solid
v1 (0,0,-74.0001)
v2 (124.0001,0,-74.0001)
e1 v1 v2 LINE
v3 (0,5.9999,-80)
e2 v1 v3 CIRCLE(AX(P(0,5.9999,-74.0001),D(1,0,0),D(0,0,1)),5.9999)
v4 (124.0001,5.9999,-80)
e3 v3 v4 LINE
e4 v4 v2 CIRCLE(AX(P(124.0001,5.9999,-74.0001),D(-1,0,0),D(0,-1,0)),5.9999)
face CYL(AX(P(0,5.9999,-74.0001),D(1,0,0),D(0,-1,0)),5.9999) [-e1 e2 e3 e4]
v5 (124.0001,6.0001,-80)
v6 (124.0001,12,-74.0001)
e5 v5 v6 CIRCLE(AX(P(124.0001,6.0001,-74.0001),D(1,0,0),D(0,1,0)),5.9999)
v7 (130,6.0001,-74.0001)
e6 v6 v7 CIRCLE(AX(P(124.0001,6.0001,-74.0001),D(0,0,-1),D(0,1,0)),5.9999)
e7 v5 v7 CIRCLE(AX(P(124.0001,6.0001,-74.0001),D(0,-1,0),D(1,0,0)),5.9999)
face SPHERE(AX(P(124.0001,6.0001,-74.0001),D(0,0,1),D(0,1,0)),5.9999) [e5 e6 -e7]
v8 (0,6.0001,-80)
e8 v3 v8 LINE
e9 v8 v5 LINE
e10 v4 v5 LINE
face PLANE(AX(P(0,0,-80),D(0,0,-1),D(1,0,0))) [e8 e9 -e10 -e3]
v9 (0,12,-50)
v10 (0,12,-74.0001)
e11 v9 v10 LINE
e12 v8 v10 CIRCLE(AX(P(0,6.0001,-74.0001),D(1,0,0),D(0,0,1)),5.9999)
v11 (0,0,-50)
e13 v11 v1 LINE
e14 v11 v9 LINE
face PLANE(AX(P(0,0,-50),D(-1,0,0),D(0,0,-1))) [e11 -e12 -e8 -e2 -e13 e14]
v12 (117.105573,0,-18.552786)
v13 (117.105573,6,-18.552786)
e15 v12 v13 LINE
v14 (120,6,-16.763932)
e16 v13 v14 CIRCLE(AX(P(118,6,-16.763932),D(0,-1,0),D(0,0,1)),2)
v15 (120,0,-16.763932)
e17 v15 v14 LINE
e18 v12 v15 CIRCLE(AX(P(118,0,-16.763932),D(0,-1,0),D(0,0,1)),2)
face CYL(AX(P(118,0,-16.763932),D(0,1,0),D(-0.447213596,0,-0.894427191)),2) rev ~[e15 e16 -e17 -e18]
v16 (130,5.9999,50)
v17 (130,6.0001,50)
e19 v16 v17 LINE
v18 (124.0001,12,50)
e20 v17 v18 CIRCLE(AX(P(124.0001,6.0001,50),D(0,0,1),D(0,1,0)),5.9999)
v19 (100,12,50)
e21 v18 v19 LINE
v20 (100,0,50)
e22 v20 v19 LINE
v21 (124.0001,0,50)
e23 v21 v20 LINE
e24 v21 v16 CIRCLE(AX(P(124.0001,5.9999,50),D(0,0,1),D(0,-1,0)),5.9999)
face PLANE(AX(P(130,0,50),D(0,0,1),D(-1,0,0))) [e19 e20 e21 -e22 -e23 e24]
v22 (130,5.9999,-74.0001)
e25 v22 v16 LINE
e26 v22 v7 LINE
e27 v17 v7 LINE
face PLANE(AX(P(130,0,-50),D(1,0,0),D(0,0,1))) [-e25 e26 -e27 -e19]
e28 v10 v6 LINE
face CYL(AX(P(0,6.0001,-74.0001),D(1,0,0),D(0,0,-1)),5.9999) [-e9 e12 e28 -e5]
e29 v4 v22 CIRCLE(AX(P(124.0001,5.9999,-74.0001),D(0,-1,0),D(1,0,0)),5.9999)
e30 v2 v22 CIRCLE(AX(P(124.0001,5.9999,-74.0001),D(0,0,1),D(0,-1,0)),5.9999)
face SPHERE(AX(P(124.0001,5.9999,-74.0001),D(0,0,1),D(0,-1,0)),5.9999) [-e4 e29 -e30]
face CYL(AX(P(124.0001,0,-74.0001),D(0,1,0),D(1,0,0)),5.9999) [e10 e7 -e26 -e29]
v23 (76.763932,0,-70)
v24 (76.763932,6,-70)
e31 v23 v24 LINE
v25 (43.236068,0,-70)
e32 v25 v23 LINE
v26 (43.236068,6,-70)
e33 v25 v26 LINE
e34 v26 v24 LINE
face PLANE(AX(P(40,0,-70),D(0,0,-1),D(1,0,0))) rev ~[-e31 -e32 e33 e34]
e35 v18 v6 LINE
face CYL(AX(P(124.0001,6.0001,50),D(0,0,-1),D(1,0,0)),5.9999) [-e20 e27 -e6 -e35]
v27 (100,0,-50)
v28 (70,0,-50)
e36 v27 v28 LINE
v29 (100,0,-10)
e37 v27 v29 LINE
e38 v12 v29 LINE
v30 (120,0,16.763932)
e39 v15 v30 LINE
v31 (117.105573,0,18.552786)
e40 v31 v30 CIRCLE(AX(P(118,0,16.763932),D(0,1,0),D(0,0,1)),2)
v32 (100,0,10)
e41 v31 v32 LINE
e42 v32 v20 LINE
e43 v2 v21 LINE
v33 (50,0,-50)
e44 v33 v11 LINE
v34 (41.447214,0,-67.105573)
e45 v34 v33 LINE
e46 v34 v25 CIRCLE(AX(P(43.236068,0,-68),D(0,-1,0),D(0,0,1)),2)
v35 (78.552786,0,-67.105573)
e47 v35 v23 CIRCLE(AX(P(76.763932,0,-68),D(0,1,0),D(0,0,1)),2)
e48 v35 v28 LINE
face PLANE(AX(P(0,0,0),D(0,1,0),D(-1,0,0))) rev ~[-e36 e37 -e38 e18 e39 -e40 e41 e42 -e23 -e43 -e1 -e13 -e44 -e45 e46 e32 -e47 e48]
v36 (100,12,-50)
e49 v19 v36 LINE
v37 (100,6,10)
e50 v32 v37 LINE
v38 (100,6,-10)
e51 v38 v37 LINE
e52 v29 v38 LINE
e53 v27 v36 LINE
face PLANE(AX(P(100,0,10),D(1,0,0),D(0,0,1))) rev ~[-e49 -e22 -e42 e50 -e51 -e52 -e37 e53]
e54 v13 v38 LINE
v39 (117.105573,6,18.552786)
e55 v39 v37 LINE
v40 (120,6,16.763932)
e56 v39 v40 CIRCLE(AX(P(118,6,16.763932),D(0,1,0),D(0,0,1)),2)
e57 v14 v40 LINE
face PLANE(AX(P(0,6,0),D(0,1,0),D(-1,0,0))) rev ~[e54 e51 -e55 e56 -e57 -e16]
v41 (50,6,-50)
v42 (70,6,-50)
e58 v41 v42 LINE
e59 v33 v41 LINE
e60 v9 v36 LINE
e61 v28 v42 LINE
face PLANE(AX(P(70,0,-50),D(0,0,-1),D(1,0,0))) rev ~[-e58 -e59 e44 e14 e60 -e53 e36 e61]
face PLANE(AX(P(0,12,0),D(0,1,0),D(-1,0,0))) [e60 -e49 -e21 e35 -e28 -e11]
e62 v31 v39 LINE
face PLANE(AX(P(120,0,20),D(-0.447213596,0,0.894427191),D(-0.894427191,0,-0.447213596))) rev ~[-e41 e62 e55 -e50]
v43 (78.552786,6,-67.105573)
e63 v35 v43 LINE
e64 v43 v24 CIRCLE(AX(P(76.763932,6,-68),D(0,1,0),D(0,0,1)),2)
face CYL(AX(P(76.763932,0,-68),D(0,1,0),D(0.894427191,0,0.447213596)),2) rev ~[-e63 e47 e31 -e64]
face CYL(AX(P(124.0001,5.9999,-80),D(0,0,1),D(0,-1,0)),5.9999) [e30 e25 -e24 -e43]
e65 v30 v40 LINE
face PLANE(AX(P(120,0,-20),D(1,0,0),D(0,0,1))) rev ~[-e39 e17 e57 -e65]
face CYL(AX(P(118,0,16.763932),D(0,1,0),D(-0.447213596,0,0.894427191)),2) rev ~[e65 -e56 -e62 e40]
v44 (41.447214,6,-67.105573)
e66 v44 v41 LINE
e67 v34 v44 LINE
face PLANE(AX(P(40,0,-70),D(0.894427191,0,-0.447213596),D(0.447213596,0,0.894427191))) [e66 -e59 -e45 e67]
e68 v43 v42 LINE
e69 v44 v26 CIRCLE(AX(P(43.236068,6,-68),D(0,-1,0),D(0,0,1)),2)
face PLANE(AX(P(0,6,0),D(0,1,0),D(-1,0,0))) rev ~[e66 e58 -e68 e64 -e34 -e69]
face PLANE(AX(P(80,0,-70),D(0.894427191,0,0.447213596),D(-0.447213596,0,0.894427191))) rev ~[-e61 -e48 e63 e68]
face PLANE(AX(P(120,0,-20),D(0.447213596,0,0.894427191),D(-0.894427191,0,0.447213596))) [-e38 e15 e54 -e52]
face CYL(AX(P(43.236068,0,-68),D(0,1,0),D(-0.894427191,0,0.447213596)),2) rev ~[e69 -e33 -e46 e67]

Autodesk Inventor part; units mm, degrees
ref_plane "YZ Plane" through (0, 0, 0) normal (1, 0, 0) x (0, 1, 0)
ref_plane "XZ Plane" through (0, 0, 0) normal (0, 1, 0) x (-1, 0, 0)
ref_plane "XY Plane" through (0, 0, 0) normal (0, 0, 1) x (1, 0, 0)
sketch "Sketch1" plane through (0, 0, 0) normal (0, 1, 0) x (-1, 0, 0)
  line L0 (100, -50) -> (-100, -50)
  line L1 (-100, -50) -> (-100, 50)
  line L2 (-100, 50) -> (100, 50)
  line L3 (100, 50) -> (100, -50)
  line L4 (100, -50) -> (-100, 50) construction
  line L5 (-100, -50) -> (100, 50) construction
  line L6 (-40, -30) -> (-80, -30)
  line L7 (-50, -50) -> (-70, -50)
  line L8 (-40, -30) -> (-50, -50)
  line L9 (-80, -30) -> (-70, -50)
  line L10 (80, -30) -> (40, -30)
  line L11 (70, -50) -> (50, -50)
  line L12 (80, -30) -> (70, -50)
  line L13 (40, -30) -> (50, -50)
  line L14 (-100, -10) -> (-100, 10)
  line L15 (-80, -20) -> (-80, 20)
  line L16 (-80, -20) -> (-100, -10)
  line L17 (-80, 20) -> (-100, 10)
  line L18 (-100, -50) -> (-130, -50)
  line L19 (-130, -50) -> (-130, 50)
  line L20 (-130, 50) -> (-100, 50)
  line L21 (-100, 50) -> (-100, -50)
  line L22 (-130, -50) -> (0, -50)
  line L23 (0, -50) -> (0, -80)
  line L24 (0, -80) -> (-130, -80)
  line L25 (-130, -80) -> (-130, -50)
  line L26 (-40, -70) -> (-80, -70)
  line L27 (-40, -70) -> (-50, -50)
  line L28 (-80, -70) -> (-70, -50)
  line L29 (-120, -20) -> (-120, 20)
  line L30 (-120, -20) -> (-100, -10)
  line L31 (-120, 20) -> (-100, 10)
  point P0 (0, 0)
  point P1 (-100, 10)
  point P2 (-100, -10)
  point P3 (-70, -50)
  point P4 (-50, -50)
  point P5 (70, -50)
  point P6 (0, 0)
  point P7 (0, 0)
  point P8 (0, -50)
  dimension "d72" = 200
  dimension "d73" = 100
  dimension "d78" = 20
  dimension "d79" = 40
  dimension "d80" = 20
  dimension "d81" = 10
  dimension "d82" = 20
  dimension "d83" = 40
  dimension "d84" = 20
  dimension "d85" = 10
  dimension "d86" = 120
  dimension "d87" = 30
  dimension "d88" = 0
  dimension "d89" = 0
  dimension "d90" = 40
  dimension "d91" = 20
  dimension "d92" = 20
  dimension "d93" = 10
  dimension "d94" = 40
  dimension "d95" = 0
  dimension "d114" = 30
  dimension "d115" = 130
  dimension "d116" = 30
extrude "Extrusion24" add sketch "Sketch1" along normal blind 12 contours L1 L31 L29 L30 L18 L19 L20 | L23 L24 L25 L18 L0 L28 L26 L27 | L1 L30 L29 L31 | L27 L26 L28 L0
extrude "Extrusion25" cut sketch "Sketch1" along normal blind 6 contours L1 L30 L29 L31 | L27 L26 L28 L0
fillet "Fillet12" radius 2 4 edges at (120, 3, 20) (120, 3, -20) (80, 3, -70) (40, 3, -70)
fillet "Fillet13" radius 6 5 edges at (130, 0, -15) (130, 12, -15) (65, 12, -80) (65, 0, -80) (130, 6, -80)
properties part number "Test2_3DPrint"
